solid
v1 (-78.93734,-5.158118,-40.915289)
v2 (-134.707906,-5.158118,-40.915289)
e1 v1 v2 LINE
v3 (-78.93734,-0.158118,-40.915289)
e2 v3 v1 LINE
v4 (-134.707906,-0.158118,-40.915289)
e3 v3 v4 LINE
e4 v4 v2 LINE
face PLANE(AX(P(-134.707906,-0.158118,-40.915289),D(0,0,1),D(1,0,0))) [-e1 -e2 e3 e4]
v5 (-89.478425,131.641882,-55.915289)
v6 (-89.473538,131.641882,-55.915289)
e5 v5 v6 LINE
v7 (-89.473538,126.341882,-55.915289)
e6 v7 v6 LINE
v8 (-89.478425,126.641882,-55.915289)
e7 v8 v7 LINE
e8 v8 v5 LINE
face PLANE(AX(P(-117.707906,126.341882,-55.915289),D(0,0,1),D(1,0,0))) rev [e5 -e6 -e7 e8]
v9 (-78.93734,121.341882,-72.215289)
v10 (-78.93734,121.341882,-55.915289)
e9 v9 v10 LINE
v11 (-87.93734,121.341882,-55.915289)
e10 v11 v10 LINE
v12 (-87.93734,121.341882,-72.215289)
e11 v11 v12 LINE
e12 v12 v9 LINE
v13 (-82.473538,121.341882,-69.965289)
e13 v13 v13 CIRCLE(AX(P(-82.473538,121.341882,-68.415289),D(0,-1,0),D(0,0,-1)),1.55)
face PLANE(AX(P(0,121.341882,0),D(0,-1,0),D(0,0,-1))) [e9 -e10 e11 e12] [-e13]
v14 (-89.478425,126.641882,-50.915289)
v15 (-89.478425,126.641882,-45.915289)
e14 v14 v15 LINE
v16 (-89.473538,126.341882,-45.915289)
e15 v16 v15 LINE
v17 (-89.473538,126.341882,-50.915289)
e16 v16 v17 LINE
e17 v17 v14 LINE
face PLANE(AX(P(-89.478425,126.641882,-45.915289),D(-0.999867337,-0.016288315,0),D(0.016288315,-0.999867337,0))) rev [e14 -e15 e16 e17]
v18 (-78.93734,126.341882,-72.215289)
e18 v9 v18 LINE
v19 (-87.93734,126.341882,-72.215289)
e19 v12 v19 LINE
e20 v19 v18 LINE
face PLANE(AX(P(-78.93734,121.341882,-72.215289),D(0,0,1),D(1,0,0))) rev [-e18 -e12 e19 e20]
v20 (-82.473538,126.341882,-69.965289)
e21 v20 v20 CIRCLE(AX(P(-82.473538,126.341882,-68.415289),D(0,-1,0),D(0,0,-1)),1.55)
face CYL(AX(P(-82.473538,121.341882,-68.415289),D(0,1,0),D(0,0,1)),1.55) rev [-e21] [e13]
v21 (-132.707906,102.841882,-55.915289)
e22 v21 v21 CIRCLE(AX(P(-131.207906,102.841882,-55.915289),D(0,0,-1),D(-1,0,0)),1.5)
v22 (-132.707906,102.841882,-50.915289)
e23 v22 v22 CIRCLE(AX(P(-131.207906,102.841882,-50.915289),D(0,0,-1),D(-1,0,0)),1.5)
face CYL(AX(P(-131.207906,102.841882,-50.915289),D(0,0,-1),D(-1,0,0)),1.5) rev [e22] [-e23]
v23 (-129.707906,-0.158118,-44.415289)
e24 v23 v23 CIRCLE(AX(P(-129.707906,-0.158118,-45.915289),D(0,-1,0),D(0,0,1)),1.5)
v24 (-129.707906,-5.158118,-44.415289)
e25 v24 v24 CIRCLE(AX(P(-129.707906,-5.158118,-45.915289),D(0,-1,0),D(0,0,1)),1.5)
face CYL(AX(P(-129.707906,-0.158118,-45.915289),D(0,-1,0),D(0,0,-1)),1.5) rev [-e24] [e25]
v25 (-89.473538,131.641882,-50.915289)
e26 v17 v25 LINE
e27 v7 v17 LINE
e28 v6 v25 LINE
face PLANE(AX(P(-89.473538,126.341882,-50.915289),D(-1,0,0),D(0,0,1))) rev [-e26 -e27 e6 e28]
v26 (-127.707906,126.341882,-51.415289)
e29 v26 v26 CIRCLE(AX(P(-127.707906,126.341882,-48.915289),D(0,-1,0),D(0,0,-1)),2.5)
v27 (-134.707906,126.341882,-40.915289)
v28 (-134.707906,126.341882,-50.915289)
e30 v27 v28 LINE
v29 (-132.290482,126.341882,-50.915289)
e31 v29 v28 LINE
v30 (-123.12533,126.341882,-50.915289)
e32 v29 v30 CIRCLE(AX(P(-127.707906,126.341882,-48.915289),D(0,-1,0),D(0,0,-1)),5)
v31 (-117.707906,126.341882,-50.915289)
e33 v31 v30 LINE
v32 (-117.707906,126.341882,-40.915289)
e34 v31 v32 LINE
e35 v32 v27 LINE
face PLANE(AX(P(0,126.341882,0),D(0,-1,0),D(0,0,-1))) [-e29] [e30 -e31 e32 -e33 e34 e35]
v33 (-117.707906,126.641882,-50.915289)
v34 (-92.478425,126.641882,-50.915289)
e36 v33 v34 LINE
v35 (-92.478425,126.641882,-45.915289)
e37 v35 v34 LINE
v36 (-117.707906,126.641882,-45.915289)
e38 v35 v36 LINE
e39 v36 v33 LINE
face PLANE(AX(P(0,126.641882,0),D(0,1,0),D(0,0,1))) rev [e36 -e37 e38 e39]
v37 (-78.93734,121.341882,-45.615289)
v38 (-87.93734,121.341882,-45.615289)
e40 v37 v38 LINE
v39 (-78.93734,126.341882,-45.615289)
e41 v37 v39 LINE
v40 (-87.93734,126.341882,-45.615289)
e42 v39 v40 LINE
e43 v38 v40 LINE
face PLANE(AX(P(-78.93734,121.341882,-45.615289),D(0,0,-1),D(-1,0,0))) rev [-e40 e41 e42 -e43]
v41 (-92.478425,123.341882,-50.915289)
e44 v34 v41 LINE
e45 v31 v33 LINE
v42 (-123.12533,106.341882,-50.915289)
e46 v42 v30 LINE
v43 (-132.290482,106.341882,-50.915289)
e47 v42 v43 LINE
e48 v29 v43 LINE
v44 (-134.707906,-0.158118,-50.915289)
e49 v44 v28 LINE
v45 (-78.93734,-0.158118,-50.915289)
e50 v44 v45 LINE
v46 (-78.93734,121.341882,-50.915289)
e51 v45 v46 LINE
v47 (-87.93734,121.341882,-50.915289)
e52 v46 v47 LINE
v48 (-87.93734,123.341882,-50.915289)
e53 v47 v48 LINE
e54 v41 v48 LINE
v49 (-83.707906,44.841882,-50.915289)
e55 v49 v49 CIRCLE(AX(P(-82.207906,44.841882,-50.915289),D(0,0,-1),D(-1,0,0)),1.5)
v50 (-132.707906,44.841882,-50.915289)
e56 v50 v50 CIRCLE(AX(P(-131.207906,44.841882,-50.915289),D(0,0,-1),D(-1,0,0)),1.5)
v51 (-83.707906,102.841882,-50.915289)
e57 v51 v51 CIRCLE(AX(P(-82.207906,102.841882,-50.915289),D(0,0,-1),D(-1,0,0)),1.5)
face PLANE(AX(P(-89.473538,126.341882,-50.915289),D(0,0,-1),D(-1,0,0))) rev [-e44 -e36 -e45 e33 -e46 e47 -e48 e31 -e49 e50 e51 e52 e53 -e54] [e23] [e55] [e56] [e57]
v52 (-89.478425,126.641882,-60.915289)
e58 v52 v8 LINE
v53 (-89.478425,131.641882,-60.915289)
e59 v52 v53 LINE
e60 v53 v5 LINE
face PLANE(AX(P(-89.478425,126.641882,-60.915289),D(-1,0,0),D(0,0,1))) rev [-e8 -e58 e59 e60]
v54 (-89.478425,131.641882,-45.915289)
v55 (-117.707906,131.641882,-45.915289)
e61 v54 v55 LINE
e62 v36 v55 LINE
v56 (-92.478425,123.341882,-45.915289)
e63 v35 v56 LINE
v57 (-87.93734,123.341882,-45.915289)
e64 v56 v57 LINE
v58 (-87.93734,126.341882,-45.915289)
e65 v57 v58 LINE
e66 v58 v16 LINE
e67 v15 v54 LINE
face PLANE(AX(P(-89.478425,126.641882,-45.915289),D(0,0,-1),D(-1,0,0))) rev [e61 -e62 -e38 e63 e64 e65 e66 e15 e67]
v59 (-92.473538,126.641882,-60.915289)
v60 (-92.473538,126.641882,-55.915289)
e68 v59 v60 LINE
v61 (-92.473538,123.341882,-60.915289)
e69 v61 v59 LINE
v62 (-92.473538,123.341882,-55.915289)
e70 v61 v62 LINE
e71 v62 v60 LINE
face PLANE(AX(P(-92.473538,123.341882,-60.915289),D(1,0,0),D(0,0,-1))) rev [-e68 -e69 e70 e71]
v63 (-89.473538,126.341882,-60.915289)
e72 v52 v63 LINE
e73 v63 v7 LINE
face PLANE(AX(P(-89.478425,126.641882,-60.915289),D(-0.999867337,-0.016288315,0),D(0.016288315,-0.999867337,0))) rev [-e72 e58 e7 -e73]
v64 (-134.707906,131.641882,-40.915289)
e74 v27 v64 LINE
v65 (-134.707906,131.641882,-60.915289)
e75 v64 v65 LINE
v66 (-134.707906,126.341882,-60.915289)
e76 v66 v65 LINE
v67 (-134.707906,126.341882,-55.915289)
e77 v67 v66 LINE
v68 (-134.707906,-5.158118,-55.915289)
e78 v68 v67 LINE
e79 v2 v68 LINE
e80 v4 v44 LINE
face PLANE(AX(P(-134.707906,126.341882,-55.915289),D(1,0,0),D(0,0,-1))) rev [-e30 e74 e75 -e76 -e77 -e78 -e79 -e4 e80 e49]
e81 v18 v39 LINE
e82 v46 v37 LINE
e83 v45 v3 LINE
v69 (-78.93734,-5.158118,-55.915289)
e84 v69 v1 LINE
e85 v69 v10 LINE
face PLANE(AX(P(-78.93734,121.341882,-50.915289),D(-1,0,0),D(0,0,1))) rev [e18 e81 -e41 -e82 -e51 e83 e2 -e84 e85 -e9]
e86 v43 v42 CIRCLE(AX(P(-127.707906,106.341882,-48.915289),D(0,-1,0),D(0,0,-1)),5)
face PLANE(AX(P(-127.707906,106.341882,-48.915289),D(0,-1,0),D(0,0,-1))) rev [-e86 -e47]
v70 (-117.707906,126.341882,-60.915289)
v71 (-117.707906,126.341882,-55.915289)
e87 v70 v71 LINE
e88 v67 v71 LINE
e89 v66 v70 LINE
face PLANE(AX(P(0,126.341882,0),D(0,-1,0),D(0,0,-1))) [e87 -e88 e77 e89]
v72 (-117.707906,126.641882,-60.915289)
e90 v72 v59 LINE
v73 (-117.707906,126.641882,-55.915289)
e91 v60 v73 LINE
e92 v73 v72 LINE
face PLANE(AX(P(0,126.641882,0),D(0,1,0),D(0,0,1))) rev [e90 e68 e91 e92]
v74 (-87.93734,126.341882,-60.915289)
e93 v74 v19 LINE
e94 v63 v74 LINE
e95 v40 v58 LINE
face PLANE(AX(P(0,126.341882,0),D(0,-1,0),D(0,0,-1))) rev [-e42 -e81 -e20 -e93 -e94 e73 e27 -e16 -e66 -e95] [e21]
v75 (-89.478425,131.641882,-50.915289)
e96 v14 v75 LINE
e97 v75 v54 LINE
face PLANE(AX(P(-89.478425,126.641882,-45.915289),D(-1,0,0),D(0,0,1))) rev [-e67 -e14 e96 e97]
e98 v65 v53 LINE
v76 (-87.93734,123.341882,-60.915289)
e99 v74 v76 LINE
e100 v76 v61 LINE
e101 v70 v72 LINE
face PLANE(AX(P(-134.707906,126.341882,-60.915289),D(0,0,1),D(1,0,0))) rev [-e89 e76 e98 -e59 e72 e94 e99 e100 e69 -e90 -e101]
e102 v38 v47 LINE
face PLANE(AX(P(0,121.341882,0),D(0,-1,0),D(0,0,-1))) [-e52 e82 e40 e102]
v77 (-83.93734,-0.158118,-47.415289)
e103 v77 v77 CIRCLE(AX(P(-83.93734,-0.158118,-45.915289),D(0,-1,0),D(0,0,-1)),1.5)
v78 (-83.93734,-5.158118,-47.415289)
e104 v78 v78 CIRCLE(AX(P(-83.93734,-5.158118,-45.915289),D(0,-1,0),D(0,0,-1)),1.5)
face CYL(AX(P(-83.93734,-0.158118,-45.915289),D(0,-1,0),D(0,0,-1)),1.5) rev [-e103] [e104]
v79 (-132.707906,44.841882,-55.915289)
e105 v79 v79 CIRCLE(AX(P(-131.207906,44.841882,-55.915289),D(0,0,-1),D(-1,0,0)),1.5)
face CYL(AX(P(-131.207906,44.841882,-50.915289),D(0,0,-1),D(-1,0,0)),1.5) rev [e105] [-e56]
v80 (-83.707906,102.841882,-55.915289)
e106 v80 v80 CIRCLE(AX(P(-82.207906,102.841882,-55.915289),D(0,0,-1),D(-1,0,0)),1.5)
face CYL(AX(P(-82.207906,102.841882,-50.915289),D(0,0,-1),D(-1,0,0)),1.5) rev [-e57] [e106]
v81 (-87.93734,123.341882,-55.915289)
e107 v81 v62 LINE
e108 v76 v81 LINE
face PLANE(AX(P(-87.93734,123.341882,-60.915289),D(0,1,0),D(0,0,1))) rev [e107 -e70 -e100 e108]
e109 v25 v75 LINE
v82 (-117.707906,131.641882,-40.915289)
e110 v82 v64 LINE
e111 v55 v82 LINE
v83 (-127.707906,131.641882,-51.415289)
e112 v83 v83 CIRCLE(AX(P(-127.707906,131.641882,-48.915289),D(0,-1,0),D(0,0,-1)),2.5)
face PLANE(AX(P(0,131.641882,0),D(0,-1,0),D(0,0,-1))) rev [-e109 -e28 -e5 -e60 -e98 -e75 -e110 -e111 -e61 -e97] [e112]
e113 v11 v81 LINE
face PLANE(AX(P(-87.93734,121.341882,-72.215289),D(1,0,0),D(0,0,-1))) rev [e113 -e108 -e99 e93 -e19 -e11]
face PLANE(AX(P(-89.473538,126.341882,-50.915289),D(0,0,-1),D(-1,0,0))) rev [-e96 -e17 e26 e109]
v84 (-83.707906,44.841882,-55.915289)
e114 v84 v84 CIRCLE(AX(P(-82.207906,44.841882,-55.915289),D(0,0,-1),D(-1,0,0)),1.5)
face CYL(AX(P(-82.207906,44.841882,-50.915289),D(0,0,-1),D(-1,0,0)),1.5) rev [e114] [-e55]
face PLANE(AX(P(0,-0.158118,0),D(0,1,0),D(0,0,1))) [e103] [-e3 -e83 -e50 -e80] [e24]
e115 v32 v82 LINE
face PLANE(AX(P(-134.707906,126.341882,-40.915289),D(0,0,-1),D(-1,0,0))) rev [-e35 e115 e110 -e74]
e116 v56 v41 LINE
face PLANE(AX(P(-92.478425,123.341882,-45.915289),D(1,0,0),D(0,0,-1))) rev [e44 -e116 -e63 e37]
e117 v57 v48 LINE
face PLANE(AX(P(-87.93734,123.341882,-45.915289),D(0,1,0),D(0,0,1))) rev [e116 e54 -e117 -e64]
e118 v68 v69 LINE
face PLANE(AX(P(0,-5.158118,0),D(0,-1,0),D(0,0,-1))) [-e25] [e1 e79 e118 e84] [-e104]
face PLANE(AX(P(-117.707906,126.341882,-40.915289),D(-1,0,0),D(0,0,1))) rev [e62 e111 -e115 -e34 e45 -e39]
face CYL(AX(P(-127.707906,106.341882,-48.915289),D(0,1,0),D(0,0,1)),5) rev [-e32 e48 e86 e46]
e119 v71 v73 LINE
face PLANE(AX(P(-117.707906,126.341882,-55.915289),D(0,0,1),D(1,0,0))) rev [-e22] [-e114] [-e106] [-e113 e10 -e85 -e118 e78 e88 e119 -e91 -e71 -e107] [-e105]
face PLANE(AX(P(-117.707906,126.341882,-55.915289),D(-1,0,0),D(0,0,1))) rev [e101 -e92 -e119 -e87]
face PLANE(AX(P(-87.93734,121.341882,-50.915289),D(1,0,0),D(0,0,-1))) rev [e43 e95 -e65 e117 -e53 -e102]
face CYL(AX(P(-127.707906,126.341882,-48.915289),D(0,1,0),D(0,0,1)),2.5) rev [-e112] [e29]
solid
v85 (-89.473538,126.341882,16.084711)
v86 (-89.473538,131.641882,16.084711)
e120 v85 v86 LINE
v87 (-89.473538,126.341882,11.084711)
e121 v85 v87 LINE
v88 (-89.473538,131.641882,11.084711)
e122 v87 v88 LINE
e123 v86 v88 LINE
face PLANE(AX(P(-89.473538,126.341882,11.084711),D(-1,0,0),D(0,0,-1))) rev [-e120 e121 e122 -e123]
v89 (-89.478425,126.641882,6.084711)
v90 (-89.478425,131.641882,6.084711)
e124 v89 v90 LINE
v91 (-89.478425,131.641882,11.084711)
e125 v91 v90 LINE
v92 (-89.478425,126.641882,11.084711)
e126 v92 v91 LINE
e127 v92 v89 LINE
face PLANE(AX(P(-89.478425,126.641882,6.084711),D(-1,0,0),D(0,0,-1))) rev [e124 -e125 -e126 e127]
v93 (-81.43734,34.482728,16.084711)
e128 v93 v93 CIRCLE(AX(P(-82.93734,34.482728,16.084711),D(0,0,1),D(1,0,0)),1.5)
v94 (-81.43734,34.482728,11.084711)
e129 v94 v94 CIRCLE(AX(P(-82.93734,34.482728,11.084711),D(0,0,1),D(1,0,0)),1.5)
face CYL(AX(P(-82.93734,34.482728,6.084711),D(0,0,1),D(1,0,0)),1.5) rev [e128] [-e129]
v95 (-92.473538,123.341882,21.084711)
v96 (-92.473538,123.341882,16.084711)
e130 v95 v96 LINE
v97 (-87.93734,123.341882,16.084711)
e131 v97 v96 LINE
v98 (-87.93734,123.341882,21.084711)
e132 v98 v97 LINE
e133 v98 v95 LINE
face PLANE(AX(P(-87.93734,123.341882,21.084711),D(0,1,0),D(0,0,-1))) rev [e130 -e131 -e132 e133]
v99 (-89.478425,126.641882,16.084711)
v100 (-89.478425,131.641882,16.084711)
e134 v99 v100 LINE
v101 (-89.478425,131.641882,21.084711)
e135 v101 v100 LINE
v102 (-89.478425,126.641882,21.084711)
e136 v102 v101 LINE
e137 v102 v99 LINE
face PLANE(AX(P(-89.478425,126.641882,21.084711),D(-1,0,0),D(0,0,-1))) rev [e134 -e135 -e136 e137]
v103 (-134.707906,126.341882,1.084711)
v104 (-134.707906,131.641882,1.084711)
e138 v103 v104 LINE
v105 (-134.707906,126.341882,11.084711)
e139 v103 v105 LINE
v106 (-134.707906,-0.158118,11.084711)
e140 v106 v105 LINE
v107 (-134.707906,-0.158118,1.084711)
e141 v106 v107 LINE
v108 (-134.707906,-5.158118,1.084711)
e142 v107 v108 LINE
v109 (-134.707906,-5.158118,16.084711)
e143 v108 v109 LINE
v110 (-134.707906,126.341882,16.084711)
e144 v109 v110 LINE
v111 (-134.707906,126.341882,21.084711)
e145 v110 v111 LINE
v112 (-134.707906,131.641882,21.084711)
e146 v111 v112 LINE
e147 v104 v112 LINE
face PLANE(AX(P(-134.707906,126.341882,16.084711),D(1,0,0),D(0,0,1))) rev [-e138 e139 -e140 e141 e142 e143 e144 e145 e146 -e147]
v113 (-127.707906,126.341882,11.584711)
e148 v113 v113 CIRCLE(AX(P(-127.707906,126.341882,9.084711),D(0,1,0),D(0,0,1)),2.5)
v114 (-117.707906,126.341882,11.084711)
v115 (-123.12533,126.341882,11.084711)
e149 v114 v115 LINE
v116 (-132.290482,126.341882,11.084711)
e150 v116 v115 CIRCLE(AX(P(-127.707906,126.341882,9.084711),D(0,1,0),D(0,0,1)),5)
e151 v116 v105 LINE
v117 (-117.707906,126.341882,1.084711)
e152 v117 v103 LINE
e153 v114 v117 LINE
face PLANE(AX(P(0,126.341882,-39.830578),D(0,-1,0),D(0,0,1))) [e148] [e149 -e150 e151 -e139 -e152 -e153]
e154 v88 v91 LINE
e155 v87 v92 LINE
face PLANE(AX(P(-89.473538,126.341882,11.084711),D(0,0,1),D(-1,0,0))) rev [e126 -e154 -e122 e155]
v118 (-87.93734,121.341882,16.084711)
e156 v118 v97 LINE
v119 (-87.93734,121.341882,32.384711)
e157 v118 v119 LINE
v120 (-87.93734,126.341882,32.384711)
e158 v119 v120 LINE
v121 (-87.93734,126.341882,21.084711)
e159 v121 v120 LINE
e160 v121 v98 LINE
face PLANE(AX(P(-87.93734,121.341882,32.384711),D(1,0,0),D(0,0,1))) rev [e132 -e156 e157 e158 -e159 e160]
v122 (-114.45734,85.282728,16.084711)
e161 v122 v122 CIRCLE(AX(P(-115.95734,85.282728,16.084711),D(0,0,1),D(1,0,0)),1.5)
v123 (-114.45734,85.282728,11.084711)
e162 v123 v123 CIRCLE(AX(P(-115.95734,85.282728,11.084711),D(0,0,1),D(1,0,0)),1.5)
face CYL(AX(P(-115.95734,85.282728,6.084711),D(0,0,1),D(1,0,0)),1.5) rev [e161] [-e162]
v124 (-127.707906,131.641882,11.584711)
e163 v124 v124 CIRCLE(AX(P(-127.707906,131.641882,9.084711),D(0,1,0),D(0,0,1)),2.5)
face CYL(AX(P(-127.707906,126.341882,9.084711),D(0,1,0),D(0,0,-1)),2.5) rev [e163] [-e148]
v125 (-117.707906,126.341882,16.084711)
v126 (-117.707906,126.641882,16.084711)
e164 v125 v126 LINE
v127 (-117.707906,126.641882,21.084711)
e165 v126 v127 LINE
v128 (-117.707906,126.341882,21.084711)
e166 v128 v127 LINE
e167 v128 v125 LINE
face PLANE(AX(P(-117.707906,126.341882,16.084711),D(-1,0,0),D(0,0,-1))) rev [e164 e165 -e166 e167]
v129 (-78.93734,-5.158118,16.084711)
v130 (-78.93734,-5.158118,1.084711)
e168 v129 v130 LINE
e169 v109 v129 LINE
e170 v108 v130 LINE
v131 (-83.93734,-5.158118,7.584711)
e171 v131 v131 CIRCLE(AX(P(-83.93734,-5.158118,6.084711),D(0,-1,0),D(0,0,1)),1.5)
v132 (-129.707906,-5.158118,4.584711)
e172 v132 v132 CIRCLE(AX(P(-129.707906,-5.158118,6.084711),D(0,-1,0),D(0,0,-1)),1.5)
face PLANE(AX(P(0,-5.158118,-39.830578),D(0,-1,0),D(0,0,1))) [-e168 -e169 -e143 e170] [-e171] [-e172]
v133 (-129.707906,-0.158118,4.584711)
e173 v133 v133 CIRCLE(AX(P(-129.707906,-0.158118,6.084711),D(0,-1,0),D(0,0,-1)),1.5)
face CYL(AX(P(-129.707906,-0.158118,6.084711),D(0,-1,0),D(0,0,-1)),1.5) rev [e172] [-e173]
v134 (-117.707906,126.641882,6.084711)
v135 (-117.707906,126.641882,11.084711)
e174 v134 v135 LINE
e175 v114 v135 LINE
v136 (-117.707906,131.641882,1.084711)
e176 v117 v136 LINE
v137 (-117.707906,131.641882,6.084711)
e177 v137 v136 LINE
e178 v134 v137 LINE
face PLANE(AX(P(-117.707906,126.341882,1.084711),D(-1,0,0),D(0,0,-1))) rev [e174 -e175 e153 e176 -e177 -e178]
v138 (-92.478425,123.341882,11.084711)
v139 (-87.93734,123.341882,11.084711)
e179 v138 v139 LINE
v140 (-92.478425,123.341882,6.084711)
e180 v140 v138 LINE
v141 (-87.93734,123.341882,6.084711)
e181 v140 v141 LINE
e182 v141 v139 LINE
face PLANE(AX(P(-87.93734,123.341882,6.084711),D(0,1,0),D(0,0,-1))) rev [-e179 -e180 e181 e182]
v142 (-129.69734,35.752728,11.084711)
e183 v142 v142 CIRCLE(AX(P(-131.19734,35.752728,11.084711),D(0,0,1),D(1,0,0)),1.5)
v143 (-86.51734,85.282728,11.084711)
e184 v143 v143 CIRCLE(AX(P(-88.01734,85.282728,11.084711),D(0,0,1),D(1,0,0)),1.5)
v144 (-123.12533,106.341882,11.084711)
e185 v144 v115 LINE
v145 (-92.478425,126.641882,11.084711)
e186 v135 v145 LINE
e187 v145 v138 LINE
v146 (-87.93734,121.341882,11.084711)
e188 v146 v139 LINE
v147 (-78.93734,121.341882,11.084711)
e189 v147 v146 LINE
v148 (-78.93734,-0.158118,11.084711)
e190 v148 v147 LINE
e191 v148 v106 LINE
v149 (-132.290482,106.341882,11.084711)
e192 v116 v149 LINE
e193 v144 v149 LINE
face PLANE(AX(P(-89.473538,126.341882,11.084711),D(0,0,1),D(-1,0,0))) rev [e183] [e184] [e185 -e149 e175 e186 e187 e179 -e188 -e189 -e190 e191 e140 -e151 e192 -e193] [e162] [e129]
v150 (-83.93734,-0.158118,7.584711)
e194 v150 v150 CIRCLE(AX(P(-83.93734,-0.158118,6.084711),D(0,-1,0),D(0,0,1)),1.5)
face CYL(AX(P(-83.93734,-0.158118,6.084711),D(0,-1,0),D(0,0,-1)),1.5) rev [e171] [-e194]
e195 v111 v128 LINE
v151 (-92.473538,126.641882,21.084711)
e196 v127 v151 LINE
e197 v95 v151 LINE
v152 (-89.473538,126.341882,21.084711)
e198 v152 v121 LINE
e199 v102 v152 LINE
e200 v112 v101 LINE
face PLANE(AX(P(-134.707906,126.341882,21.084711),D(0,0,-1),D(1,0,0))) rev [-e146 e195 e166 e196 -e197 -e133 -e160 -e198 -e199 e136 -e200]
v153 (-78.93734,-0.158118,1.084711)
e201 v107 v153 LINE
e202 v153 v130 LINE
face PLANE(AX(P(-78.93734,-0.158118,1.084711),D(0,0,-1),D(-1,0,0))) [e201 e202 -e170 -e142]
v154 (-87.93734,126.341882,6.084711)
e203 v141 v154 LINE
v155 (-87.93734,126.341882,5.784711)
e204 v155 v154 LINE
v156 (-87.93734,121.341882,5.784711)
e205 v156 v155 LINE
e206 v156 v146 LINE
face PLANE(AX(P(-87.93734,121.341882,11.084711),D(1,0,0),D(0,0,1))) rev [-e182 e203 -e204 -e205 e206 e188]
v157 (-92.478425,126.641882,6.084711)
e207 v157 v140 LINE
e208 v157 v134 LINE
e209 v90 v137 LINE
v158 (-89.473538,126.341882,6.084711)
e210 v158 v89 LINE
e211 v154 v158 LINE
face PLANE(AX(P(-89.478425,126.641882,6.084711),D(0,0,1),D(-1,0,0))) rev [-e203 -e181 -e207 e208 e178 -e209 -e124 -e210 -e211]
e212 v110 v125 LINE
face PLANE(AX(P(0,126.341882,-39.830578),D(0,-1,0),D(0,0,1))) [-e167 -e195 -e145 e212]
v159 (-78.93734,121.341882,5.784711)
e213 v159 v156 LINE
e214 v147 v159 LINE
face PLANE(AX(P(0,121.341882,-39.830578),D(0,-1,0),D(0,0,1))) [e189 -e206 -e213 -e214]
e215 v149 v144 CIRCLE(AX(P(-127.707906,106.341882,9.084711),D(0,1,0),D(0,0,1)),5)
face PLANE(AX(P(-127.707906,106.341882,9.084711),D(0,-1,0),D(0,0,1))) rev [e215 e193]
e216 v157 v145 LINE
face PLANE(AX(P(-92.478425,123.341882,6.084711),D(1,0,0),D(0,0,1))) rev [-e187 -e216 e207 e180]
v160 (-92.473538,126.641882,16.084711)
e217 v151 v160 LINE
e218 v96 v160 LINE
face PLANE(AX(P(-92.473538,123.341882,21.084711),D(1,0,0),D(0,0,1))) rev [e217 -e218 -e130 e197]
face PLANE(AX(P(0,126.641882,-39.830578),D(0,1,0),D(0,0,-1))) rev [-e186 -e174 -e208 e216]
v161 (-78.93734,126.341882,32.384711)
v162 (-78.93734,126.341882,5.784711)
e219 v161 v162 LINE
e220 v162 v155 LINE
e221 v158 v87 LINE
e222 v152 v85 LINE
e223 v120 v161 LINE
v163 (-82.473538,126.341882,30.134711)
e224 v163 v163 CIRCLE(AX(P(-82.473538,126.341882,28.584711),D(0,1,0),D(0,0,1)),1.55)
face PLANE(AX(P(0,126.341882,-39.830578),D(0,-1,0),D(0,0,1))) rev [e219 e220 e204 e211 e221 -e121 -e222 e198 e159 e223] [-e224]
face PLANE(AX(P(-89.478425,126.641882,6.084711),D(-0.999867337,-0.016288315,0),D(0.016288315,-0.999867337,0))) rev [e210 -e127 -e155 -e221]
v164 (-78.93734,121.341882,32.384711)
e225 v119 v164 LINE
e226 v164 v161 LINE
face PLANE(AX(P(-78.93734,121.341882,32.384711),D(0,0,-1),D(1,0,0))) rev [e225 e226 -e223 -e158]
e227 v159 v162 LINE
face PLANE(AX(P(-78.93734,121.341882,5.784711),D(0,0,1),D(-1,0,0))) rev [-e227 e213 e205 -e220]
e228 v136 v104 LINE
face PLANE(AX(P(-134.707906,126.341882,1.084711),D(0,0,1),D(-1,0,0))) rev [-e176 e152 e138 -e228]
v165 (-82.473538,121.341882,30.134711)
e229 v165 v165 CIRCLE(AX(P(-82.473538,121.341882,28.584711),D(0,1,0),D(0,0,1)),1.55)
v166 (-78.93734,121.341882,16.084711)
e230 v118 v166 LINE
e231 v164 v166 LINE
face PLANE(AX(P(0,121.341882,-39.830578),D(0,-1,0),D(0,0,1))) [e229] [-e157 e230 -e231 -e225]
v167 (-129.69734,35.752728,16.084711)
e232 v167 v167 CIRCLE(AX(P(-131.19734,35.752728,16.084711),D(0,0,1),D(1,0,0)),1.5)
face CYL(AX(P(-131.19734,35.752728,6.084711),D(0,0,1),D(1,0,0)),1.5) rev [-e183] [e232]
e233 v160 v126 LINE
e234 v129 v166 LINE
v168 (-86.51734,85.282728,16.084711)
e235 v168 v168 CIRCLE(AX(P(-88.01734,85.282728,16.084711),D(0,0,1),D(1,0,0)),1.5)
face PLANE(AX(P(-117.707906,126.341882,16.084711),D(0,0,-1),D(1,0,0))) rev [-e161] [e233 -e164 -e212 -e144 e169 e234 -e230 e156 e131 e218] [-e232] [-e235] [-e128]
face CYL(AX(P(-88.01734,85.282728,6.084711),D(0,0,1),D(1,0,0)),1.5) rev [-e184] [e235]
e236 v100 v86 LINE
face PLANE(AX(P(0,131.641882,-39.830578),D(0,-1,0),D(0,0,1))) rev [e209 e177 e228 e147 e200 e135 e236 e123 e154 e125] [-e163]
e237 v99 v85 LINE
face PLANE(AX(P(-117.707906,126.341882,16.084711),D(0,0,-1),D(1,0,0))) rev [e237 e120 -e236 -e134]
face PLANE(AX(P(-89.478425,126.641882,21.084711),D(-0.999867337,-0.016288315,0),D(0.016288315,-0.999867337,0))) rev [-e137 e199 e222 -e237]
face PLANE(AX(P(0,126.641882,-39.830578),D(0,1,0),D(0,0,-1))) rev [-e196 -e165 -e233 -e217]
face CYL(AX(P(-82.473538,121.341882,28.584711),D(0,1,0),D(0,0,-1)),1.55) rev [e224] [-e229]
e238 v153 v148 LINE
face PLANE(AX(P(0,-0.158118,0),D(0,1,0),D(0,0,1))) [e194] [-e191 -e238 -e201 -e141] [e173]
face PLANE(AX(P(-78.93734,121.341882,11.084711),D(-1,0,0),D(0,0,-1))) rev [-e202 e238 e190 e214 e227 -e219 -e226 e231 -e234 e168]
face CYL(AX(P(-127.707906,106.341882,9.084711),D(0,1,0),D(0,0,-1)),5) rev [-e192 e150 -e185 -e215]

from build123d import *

# Parameters (mm, degrees)
EXTRUDE_1_OUTLINE_R = 2.5
EXTRUDE_1_DEPTH     = 5.3
SKETCH_2_R          = 1.55
EXTRUDE_2_DEPTH     = 5
SKETCH_3_W          = 55.770566096
SKETCH_3_H          = 5
EXTRUDE_3_DEPTH     = 126.5
SKETCH_4_R          = 5
CUT_EXTRUDE_1_DEPTH = 20
SKETCH_5_W          = 28.229480684
SKETCH_5_H          = 5
EXTRUDE_4_DEPTH     = 5
EXTRUDE_5_DEPTH     = 5
EXTRUDE_6_DEPTH     = 5
SKETCH_8_W          = 55.770566096
SKETCH_8_H          = 10
SKETCH_8_R          = 1.5
EXTRUDE_7_DEPTH     = 5
SKETCH_9_R          = 1.5
CUT_EXTRUDE_2_DEPTH = 5
SKETCH_10_R         = 1.5
CUT_EXTRUDE_3_DEPTH = 10


# Read off the part's stored shape, not the designer's step: 填料-伸長1
with BuildPart() as part:
    # 填料-伸長1 outline → 填料-伸長1 (new body)
    with BuildSketch(Plane.XZ.offset(-131.641882403)):
        Polygon((-134.707905988, -40.915289206), (-134.707905988, -60.915289206), (-117.707905988, -60.915289206), (-117.707905988, -55.915289206), (-89.473538161, -55.915289206), (-89.473538161, -50.915289206), (-117.707905988, -50.915289206), (-117.707905988, -40.915289206), align=None)
        with Locations((-127.707905988, -48.915289206)):
            Circle(EXTRUDE_1_OUTLINE_R, mode=Mode.SUBTRACT)
    extrude(amount=EXTRUDE_1_DEPTH)

    # 草圖2 → 填料-伸長2 (add)
    with BuildSketch(Plane.XZ.offset(-126.341882403)):
        Polygon((-122.707905988, -50.915289206), (-134.707905988, -50.915289206), (-134.707905988, -55.915289206), (-117.707905988, -55.915289206), (-89.473538161, -55.915289206), (-87.937339892, -55.915289206), (-87.937339892, -72.215289206), (-85.473538161, -72.215289206), (-78.937339892, -72.215289206), (-78.937339892, -55.915289206), (-78.937339892, -50.915289206), (-78.937339892, -45.615289206), (-87.937339892, -45.615289206), (-87.937339892, -50.915289206), (-89.473538161, -50.915289206), (-117.707905988, -50.915289206), align=None)
        with Locations(Location((-82.473538161, -68.415289206, 0), (0, 0, 270))):
            Circle(SKETCH_2_R, mode=Mode.SUBTRACT)
    extrude(amount=EXTRUDE_2_DEPTH)

    # 草圖3 → 填料-伸長3 (add)
    with BuildSketch(Plane.XZ.offset(-121.341882403)):
        with Locations((-106.82262294, -53.415289206)):
            Rectangle(SKETCH_3_W, SKETCH_3_H)
    extrude(amount=EXTRUDE_3_DEPTH)

    # 草圖4 → 除料-伸長1 (cut)
    with BuildSketch(Plane.XZ.offset(-126.341882403)):
        with Locations((-127.707905988, -48.915289206)):
            Circle(SKETCH_4_R)
    extrude(amount=CUT_EXTRUDE_1_DEPTH, mode=Mode.SUBTRACT)

    # 草圖5 → 填料-伸長4 (add)
    with BuildSketch(Plane.XZ.offset(-131.641882403)):
        with Locations((-103.593165646, -58.415289206)):
            Rectangle(SKETCH_5_W, SKETCH_5_H)
        with Locations((-103.593165646, -48.415289206)):
            Rectangle(SKETCH_5_W, SKETCH_5_H)
    extrude(amount=EXTRUDE_4_DEPTH)

    # 草圖6 → 填料-伸長5 (add)
    with BuildSketch(Plane(origin=(0, 0, -55.915289206), x_dir=(-1, 0, 0), z_dir=(0, 0, -1))):
        Polygon((89.478425304, 126.641882403), (89.473538161, 126.341882403), (87.937339892, 126.341882403), (87.937339892, 123.341882403), (92.473538161, 123.341882403), (92.473538161, 126.641882403), align=None)
    extrude(amount=EXTRUDE_5_DEPTH)

    # 草圖7 → 填料-伸長6 (add)
    with BuildSketch(Plane.XY.offset(-50.915289206)):
        Polygon((-89.478425304, 126.641882403), (-89.473538161, 126.341882403), (-87.937339892, 126.341882403), (-87.937339892, 123.341882403), (-92.478425304, 123.341882403), (-92.478425304, 126.641882403), align=None)
    extrude(amount=EXTRUDE_6_DEPTH)


with BuildPart() as body_2:
    # 鏡射12: mirrored copy
    add(part.part.mirror(Plane.XY.offset(-19.915289206)))


with BuildPart() as part_1:
    add(part.part)

    add(body_2.part)  # 填料-伸長7 merges body 2
    # 草圖8 → 填料-伸長7 (add)
    # profile 1 of 2: a face of its own
    with BuildSketch(Plane.XZ.offset(5.158117597)):
        with Locations((-106.82262294, 6.084710794)):
            Rectangle(SKETCH_8_W, SKETCH_8_H)
        with Locations(Location((-129.707905988, 6.084710794, 0), (0, 0, 270))):
            Circle(SKETCH_8_R, mode=Mode.SUBTRACT)
        with Locations(Location((-83.937339892, 6.084710794, 0), (0, 0, 90))):
            Circle(SKETCH_8_R, mode=Mode.SUBTRACT)
    # profile 2 of 2: a face of its own
    with BuildSketch(Plane.XZ.offset(5.158117597)):
        with Locations((-106.82262294, -45.915289206)):
            Rectangle(SKETCH_8_W, SKETCH_8_H)
        with Locations(Location((-129.707905988, -45.915289206, 0), (0, 0, 90))):
            Circle(SKETCH_8_R, mode=Mode.SUBTRACT)
        with Locations(Location((-83.937339892, -45.915289206, 0), (0, 0, 270))):
            Circle(SKETCH_8_R, mode=Mode.SUBTRACT)
    extrude(amount=-EXTRUDE_7_DEPTH)

    # 草圖9 → 除料-伸長2 (cut)
    with BuildSketch(Plane(origin=(0, 0, -55.915289206), x_dir=(-1, 0, 0), z_dir=(0, 0, -1))):
        with Locations((131.207905988, 44.841882403)):
            Circle(SKETCH_9_R)
        with Locations((131.207905988, 102.841882403)):
            Circle(SKETCH_9_R)
        with Locations((82.207905988, 102.841882403)):
            Circle(SKETCH_9_R)
        with Locations((82.207905988, 44.841882403)):
            Circle(SKETCH_9_R)
    extrude(amount=-CUT_EXTRUDE_2_DEPTH, mode=Mode.SUBTRACT)

    # 草圖10 → 除料-伸長3 (cut)
    with BuildSketch(Plane.XY.offset(16.084710794)):
        with Locations((-88.017339892, 85.282727934)):
            Circle(SKETCH_10_R)
        with Locations((-115.957339892, 85.282727934)):
            Circle(SKETCH_10_R)
        with Locations((-131.197339892, 35.752727934)):
            Circle(SKETCH_10_R)
        with Locations((-82.937339892, 34.482727934)):
            Circle(SKETCH_10_R)
    extrude(amount=-CUT_EXTRUDE_3_DEPTH, mode=Mode.SUBTRACT)


solid = part_1.part
